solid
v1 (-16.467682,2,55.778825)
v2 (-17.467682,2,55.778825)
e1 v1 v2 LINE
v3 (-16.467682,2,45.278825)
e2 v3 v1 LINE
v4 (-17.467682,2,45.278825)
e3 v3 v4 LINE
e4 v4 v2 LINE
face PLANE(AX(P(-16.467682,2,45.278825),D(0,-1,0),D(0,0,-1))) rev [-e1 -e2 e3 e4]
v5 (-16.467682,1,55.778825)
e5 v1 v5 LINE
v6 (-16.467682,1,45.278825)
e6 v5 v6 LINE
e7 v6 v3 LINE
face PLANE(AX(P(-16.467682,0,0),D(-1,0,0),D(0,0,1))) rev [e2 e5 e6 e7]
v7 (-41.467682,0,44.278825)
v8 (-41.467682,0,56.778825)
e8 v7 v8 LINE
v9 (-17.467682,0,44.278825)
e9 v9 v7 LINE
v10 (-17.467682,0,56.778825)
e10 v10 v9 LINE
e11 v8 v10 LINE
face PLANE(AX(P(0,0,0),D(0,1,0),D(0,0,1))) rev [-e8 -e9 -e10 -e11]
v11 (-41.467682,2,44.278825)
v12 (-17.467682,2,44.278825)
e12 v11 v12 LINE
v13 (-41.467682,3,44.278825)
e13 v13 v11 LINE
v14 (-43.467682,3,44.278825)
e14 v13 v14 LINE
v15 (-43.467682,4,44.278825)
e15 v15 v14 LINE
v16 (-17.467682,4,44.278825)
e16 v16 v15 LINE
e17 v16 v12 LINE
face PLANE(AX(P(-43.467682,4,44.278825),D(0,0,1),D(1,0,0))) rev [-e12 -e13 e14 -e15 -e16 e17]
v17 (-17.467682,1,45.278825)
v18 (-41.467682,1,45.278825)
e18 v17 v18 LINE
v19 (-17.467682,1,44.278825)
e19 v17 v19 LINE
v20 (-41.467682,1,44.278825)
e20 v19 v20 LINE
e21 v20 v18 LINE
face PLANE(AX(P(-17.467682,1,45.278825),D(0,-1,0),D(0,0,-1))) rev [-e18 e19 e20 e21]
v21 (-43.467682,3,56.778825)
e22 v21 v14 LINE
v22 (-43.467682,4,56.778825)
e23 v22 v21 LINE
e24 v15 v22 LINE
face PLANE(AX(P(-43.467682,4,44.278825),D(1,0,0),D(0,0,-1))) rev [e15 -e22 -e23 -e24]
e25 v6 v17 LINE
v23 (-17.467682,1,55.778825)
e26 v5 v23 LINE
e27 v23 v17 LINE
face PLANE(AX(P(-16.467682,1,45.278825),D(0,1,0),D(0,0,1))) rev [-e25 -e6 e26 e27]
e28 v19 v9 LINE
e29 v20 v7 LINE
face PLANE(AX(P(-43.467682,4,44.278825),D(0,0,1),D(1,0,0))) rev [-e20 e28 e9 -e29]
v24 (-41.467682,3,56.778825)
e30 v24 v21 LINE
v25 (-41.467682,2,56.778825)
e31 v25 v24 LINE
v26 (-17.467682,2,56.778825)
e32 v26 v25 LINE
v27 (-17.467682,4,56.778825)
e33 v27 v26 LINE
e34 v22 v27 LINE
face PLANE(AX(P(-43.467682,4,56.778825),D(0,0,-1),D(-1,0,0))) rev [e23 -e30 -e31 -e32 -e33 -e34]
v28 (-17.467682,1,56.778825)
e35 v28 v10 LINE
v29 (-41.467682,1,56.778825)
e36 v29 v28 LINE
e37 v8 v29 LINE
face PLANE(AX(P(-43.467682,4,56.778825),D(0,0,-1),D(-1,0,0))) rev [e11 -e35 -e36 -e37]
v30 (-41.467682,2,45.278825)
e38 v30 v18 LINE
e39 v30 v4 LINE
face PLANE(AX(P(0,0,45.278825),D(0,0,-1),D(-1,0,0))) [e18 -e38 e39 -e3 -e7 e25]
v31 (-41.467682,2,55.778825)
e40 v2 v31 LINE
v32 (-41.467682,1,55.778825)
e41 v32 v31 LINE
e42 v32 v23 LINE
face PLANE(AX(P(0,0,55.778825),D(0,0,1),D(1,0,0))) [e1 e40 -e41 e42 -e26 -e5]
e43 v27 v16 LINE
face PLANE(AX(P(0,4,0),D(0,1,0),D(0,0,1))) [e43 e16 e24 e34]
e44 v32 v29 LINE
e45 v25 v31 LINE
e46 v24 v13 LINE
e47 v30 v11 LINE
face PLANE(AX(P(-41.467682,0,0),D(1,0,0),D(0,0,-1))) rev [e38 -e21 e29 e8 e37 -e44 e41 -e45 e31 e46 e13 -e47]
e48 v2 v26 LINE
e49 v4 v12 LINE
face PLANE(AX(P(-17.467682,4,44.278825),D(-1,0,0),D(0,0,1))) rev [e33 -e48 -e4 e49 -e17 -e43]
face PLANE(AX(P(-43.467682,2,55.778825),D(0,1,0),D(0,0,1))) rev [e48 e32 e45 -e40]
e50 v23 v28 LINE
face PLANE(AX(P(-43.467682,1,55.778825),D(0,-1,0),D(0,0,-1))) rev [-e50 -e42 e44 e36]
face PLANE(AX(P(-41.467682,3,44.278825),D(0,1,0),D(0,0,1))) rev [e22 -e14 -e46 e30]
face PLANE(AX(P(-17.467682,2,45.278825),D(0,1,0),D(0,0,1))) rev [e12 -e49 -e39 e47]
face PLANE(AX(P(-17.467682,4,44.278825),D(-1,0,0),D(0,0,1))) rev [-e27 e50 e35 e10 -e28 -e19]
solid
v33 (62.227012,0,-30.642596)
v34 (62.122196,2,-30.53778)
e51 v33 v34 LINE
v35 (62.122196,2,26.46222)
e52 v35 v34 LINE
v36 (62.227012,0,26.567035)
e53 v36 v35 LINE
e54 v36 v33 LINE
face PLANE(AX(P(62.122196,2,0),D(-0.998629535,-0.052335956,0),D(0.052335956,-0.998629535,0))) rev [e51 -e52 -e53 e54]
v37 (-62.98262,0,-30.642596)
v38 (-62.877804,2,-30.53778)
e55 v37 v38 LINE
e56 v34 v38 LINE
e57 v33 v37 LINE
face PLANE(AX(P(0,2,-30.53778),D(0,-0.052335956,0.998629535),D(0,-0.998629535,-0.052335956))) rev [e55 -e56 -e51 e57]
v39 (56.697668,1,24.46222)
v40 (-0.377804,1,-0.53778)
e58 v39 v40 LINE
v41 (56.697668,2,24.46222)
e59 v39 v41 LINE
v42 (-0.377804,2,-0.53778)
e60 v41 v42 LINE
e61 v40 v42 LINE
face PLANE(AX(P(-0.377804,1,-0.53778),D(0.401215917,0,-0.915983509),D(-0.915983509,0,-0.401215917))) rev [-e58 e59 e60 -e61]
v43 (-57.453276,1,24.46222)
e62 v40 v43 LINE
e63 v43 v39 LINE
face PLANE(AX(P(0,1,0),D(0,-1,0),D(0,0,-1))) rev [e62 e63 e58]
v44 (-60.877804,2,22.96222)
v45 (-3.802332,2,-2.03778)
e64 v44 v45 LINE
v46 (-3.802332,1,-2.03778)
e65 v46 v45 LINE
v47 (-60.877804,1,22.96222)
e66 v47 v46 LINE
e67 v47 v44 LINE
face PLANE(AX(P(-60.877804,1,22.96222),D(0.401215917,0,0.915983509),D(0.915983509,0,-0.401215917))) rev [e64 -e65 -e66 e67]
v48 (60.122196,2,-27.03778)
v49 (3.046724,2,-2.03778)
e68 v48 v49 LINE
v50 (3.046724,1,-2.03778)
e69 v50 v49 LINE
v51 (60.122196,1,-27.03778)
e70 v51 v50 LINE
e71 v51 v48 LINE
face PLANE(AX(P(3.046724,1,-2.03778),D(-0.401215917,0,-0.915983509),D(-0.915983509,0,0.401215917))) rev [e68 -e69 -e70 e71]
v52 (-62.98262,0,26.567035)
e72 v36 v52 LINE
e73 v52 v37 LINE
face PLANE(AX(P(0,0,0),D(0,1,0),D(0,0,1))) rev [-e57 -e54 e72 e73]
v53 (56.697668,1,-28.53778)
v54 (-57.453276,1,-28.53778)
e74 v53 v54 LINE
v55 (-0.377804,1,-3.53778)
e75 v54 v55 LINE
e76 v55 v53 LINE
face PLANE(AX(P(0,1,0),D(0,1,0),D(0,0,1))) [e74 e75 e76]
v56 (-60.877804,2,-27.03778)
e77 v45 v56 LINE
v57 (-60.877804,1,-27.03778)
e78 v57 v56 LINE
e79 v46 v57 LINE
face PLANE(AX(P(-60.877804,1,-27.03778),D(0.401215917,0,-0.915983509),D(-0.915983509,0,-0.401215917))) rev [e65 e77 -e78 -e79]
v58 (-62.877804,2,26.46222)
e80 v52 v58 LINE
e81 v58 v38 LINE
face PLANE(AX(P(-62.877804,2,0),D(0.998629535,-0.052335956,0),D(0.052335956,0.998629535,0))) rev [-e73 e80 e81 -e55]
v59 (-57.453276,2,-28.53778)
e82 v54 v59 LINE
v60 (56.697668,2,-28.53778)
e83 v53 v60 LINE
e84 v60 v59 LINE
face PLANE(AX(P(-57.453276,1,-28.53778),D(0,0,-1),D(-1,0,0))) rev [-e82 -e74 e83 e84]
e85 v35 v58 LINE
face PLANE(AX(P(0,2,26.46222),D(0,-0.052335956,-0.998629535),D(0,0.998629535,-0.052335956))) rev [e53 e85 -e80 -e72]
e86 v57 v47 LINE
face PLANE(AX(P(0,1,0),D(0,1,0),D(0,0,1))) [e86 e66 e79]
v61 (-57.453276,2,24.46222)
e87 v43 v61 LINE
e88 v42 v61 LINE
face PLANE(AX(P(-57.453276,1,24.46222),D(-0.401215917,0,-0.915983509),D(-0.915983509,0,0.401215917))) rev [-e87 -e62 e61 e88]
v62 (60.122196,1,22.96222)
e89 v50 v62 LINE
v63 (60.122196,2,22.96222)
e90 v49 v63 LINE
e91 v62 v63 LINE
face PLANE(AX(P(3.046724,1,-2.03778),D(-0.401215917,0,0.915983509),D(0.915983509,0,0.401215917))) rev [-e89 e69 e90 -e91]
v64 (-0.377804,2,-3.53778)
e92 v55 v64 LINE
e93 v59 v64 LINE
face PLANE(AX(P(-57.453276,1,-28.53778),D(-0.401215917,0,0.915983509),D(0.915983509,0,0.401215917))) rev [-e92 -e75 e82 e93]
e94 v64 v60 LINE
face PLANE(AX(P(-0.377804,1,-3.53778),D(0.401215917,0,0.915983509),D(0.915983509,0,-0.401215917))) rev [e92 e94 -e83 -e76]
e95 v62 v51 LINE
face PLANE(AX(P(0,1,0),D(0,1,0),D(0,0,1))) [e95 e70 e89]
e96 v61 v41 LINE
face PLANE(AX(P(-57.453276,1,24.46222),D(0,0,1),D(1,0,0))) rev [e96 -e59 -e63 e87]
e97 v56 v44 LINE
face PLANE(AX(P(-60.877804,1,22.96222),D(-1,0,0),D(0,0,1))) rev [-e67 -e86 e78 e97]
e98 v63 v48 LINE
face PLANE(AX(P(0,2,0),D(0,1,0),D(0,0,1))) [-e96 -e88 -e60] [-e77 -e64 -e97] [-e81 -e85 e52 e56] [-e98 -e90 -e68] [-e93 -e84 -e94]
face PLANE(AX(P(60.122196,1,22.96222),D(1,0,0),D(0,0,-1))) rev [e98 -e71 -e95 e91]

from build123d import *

# Parameters (mm, degrees)
SKETCH1_W           = 128
SKETCH1_H           = 60
BOSS_EXTRUDE1_DEPTH = 2
GROOVE2_START       = -32.037780401
GROOVE2_OUTLINE_W   = 128
GROOVE2_OUTLINE_H   = 2
GROOVE2_DEPTH       = 1.395184441
GROOVE2_START_2     = 26.567035157
GROOVE2_2_OUTLINE_W = 128
GROOVE2_2_OUTLINE_H = 2
GROOVE2_2_DEPTH     = 1.395184442
GROOVE2_3_DEPTH     = 60
GROOVE2_START_3     = -64
GROOVE2_4_DEPTH     = 127
CUT_EXTRUDE1_DEPTH  = 1
SKETCH6_W           = 26
SKETCH6_H           = 12.5
BOSS_EXTRUDE2_DEPTH = 4
SKETCH7_W           = 26
SKETCH7_H           = 1
CUT_EXTRUDE2_DEPTH  = 1
SKETCH8_W           = 26
SKETCH8_H           = 1
CUT_EXTRUDE3_DEPTH  = 1
SKETCH10_W          = 10.5
SKETCH10_H          = 1
BOSS_EXTRUDE3_DEPTH = 1
SKETCH11_W          = 12.5
SKETCH11_H          = 3
CUT_EXTRUDE4_DEPTH  = 2


with BuildPart() as part:
    # Sketch1 → Boss-Extrude1 (new body)
    with BuildSketch(Plane(origin=(0, 0, 0), x_dir=(1, 0, 0), z_dir=(0, 1, 0))):
        with Locations((-0.377804014, 2.037780401)):
            Rectangle(SKETCH1_W, SKETCH1_H)
    extrude(amount=BOSS_EXTRUDE1_DEPTH)

    # Groove2: read off the stored shape, not the designer's step
    # Groove2 outline → Groove2 (cut)
    with BuildSketch(Plane.XY.offset(GROOVE2_START)):
        with Locations((-0.377804014, 1)):
            Rectangle(GROOVE2_OUTLINE_W, GROOVE2_OUTLINE_H)
    extrude(amount=GROOVE2_DEPTH, mode=Mode.SUBTRACT)

    # Groove2 2 outline → Groove2 2 (cut)
    with BuildSketch(Plane.XY.offset(GROOVE2_START_2)):
        with Locations((-0.377804014, 1)):
            Rectangle(GROOVE2_2_OUTLINE_W, GROOVE2_2_OUTLINE_H)
    extrude(amount=GROOVE2_2_DEPTH, mode=Mode.SUBTRACT)

    # Groove2 3 outline → Groove2 3 (cut)
    with BuildSketch(Plane.XY.offset(GROOVE2_START)):
        Polygon((63.622195986, 2), (62.122195986, 2), (62.227011544, 0), (63.622195986, 0), align=None)
        Polygon((-62.982619573, 0), (-62.877804014, 2), (-64.377804014, 2), (-64.377804014, 0), align=None)
    extrude(amount=GROOVE2_3_DEPTH, mode=Mode.SUBTRACT)

    # Groove2 4 outline → Groove2 4 (cut)
    with BuildSketch(Plane.YZ.offset(GROOVE2_START_3)):
        Polygon((2, 26.567035157), (0, 26.567035157), (2, 26.462219599), align=None)
        Polygon((2, -30.64259596), (2, -30.537780401), (0, -30.64259596), align=None)
    extrude(amount=GROOVE2_4_DEPTH, mode=Mode.SUBTRACT)

    # Sketch4 → Cut-Extrude1 (cut)
    with BuildSketch(Plane(origin=(0, 2, 0), x_dir=(1, 0, 0), z_dir=(0, 1, 0))):
        Polygon((-57.453275712, -24.462219599), (56.697667684, -24.462219599), (-0.377804014, 0.537780401), align=None)
        Polygon((-60.877804014, -22.962219599), (-60.877804014, 27.037780401), (-3.802332316, 2.037780401), align=None)
        Polygon((-57.453275712, 28.537780401), (56.697667684, 28.537780401), (-0.377804014, 3.537780401), align=None)
        Polygon((60.122195986, -22.962219599), (60.122195986, 27.037780401), (3.046724288, 2.037780401), align=None)
    extrude(amount=-CUT_EXTRUDE1_DEPTH, mode=Mode.SUBTRACT)


with BuildPart() as body_2:
    # Sketch6 → Boss-Extrude2 (new body)
    with BuildSketch(Plane(origin=(0, 0, 0), x_dir=(1, 0, 0), z_dir=(0, 1, 0))):
        with Locations((-30.467681851, -50.528824738)):
            Rectangle(SKETCH6_W, SKETCH6_H)
    extrude(amount=BOSS_EXTRUDE2_DEPTH)

    # Sketch7 → Cut-Extrude2 (cut)
    with BuildSketch(Plane.XY.offset(56.778824738)):
        with Locations((-30.467681851, 1.5)):
            Rectangle(SKETCH7_W, SKETCH7_H)
    extrude(amount=-CUT_EXTRUDE2_DEPTH, mode=Mode.SUBTRACT)

    # Sketch8 → Cut-Extrude3 (cut)
    with BuildSketch(Plane(origin=(0, 0, 44.278824738), x_dir=(-1, 0, 0), z_dir=(0, 0, -1))):
        with Locations((30.467681851, 1.5)):
            Rectangle(SKETCH8_W, SKETCH8_H)
    extrude(amount=-CUT_EXTRUDE3_DEPTH, mode=Mode.SUBTRACT)

    # Sketch10 → Boss-Extrude3 (add)
    with BuildSketch(Plane(origin=(-17.467681851, 0, 0), x_dir=(0, 0, -1), z_dir=(1, 0, 0))):
        with Locations((-50.528824738, 1.5)):
            Rectangle(SKETCH10_W, SKETCH10_H)
    extrude(amount=BOSS_EXTRUDE3_DEPTH)

    # Sketch11 → Cut-Extrude4 (cut)
    with BuildSketch(Plane.ZY.offset(43.467681851)):
        with Locations((50.528824738, 1.5)):
            Rectangle(SKETCH11_W, SKETCH11_H)
    extrude(amount=-CUT_EXTRUDE4_DEPTH, mode=Mode.SUBTRACT)


solid = Compound([part.part, body_2.part])
